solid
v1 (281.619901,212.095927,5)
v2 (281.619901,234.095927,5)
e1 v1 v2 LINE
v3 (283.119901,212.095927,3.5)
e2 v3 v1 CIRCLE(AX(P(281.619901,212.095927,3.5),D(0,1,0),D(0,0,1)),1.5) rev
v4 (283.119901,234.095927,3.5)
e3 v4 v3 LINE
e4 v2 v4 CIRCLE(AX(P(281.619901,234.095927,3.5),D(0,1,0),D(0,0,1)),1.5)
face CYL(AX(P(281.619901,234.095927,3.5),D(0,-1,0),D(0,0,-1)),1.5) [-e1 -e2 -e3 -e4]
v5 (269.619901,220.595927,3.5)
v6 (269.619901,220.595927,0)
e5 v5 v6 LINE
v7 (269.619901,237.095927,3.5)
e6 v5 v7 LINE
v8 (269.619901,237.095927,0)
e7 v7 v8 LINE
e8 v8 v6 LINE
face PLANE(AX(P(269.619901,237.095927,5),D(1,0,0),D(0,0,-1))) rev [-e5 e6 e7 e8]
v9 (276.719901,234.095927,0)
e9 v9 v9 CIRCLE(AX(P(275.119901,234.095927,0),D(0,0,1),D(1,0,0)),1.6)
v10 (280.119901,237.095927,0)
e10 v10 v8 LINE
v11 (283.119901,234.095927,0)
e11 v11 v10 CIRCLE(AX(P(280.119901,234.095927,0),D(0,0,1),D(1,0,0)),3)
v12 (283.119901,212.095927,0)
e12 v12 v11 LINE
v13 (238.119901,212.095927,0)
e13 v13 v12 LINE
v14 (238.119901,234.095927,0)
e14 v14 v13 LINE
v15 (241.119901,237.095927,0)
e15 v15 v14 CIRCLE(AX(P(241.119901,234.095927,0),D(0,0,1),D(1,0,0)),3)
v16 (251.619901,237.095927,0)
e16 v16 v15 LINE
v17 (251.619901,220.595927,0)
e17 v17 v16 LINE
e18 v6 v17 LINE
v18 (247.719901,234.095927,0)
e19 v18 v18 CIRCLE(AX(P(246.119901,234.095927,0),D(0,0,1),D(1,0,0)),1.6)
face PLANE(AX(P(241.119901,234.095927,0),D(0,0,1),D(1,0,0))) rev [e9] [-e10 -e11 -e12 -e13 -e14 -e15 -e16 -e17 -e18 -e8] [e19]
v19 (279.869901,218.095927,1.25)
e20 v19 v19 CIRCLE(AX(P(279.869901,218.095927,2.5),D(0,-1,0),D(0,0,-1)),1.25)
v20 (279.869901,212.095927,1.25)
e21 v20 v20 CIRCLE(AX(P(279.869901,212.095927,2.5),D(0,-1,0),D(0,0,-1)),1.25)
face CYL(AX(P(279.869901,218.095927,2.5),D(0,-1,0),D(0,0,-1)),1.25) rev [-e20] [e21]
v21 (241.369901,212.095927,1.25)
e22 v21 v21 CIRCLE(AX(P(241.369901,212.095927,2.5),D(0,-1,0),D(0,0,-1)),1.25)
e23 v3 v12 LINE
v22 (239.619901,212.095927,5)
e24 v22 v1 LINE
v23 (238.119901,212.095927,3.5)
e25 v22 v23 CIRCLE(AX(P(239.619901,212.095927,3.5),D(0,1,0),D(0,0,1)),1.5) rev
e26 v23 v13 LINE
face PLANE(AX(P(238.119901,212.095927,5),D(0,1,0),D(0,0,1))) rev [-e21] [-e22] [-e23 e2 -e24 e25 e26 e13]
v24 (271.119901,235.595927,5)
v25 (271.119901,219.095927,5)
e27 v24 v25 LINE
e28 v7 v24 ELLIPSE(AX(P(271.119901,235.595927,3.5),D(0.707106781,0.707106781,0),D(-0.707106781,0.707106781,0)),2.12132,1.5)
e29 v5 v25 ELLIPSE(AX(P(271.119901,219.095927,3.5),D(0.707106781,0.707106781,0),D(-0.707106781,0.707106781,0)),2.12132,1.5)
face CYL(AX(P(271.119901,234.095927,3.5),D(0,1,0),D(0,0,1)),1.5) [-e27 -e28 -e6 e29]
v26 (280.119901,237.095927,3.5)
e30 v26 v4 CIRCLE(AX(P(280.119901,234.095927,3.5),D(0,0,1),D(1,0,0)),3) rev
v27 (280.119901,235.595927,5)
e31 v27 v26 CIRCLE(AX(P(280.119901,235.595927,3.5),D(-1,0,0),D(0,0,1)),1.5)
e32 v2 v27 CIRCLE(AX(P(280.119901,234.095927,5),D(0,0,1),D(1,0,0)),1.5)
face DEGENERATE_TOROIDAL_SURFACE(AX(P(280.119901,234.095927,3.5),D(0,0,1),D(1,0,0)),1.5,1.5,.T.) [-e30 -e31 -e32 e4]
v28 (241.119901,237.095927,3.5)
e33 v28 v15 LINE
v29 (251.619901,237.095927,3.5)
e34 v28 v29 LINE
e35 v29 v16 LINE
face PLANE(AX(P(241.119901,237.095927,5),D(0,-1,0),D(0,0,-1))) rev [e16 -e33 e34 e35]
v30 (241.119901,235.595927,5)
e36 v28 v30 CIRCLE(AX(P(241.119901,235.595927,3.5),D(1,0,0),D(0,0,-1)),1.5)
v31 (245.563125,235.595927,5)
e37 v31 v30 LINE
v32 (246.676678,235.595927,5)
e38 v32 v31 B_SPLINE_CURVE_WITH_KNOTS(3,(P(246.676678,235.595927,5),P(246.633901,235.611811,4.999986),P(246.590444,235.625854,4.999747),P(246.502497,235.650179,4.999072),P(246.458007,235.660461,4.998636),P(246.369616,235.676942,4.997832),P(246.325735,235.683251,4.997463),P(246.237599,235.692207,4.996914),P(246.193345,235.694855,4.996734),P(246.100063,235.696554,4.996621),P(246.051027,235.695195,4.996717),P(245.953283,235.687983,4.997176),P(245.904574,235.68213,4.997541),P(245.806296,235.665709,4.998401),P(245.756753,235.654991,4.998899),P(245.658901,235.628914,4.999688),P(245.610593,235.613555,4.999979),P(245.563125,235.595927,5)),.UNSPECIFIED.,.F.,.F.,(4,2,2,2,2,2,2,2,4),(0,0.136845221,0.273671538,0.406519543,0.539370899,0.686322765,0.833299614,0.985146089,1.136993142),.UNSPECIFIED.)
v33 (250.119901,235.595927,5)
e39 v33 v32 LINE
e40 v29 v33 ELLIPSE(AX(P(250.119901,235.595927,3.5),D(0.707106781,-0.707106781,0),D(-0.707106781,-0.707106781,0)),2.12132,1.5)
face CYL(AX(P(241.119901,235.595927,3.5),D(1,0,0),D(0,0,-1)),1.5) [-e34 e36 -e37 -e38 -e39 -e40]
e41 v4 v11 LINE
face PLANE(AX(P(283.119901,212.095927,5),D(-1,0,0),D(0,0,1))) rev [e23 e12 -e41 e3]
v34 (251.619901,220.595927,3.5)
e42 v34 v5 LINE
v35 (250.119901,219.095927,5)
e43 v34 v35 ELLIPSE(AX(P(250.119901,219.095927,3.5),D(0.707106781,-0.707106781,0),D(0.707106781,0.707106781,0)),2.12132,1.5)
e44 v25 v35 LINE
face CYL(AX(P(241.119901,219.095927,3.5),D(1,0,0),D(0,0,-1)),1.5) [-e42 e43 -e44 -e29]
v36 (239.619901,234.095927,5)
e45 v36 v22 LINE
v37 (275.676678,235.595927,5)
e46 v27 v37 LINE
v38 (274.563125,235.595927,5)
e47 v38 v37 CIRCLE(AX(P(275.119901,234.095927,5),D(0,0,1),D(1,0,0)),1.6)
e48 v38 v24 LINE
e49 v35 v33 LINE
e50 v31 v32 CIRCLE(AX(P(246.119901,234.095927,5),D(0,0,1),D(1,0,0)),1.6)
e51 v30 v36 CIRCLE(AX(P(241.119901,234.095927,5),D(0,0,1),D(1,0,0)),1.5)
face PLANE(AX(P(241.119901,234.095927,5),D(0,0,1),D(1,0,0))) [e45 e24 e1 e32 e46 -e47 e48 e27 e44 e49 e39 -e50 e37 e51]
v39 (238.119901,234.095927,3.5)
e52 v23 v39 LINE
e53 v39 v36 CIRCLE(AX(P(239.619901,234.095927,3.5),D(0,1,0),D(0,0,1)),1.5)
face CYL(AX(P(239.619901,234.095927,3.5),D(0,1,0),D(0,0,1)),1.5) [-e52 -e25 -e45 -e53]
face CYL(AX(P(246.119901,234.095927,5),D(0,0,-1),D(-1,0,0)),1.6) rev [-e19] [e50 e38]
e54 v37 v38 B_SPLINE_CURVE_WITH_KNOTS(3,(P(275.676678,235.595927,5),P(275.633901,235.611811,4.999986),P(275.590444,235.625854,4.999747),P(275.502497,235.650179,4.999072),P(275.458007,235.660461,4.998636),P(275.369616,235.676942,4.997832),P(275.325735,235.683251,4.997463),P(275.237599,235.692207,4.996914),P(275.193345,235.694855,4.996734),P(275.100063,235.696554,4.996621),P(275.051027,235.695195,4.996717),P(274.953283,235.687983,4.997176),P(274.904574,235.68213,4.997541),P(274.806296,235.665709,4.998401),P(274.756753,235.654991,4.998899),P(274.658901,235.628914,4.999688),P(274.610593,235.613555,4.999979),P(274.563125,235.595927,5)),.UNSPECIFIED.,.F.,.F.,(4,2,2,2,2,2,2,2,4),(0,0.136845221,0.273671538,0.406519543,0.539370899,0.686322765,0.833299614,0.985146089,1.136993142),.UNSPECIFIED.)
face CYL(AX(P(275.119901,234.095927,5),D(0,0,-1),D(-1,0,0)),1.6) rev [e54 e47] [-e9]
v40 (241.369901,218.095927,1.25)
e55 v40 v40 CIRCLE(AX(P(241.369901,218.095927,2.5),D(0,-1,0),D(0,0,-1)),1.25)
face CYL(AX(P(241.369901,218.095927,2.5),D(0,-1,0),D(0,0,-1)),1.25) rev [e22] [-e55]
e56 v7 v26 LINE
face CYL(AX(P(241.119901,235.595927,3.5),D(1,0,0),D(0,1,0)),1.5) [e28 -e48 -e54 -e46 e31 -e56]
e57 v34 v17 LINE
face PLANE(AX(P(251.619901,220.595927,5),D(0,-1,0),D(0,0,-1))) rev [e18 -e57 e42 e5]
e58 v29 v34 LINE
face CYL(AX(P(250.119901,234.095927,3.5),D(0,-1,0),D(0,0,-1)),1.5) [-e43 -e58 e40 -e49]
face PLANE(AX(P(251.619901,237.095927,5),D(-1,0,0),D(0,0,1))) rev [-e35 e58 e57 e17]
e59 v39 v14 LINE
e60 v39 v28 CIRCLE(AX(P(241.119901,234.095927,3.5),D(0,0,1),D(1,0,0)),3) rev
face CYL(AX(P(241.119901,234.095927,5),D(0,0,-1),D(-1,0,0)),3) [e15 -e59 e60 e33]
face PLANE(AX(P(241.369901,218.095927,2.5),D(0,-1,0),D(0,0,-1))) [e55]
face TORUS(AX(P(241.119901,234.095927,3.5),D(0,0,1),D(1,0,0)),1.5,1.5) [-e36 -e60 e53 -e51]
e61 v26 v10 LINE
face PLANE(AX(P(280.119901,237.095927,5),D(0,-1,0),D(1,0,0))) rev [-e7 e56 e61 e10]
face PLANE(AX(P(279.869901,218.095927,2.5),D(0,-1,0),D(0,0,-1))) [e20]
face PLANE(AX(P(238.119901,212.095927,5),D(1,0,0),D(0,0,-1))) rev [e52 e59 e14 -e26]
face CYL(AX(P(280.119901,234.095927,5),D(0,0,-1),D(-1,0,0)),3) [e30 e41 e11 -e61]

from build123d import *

# Parameters (mm, degrees)
MODEL_R             = 1.6
EXTRUDE_1_DEPTH     = 5
SKETCH_2_R          = 1.25
CUT_EXTRUDE_1_DEPTH = 6
FILLET_1_R          = 1.5


with BuildPart() as part:
    # Model → 凸台-拉伸1 (new body)
    with BuildSketch(Plane.XY):
        with BuildLine():
            Line((241.119901236, 237.095927438), (251.619901236, 237.095927438))
            Line((251.619901236, 237.095927438), (251.619901236, 220.595927438))
            Line((251.619901236, 220.595927438), (269.619901236, 220.595927438))
            Line((269.619901236, 220.595927438), (269.619901236, 237.095927438))
            Line((269.619901236, 237.095927438), (280.119901236, 237.095927438))
            ThreePointArc((280.119901236, 237.095927438), (282.241221579, 236.217247782), (283.119901236, 234.095927438))
            Line((283.119901236, 234.095927438), (283.119901236, 212.095927438))
            Line((283.119901236, 212.095927438), (238.119901236, 212.095927438))
            Line((238.119901236, 212.095927438), (238.119901236, 234.095927438))
            ThreePointArc((238.119901236, 234.095927438), (238.998580892, 236.217247782), (241.119901236, 237.095927438))
        make_face()
        with Locations((246.119901236, 234.095927438)):
            Circle(MODEL_R, mode=Mode.SUBTRACT)
        with Locations((275.119901236, 234.095927438)):
            Circle(MODEL_R, mode=Mode.SUBTRACT)
    extrude(amount=EXTRUDE_1_DEPTH)

    # 草图2 → 切除-拉伸1 (cut)
    with BuildSketch(Plane.XZ.offset(-212.095927438)):
        with Locations(Location((241.369901236, 2.5, 0), (0, 0, 270))):
            Circle(SKETCH_2_R)
        with Locations(Location((279.869901236, 2.5, 0), (0, 0, 270))):
            Circle(SKETCH_2_R)
    extrude(amount=-CUT_EXTRUDE_1_DEPTH, mode=Mode.SUBTRACT)

    # 圆角1
    # the kernel refuses this fillet: 1.5 mm, written as the material it takes off along each edge
    with BuildSketch(Plane(origin=(283.119901236, 234.095927438, 5), x_dir=(0, 0, -1), z_dir=(0, -1, 0))) as fillet_1_piece_1:
        with BuildLine():
            CenterArc((FILLET_1_R, -FILLET_1_R), FILLET_1_R, 90, 90)
            Line((0, -FILLET_1_R), (0, 0))
            Line((0, 0), (FILLET_1_R, 0))
        make_face()
    extrude(amount=25.75, mode=Mode.SUBTRACT)
    with BuildSketch(Plane(origin=(280.119901236, 234.095927438, 5), x_dir=(0, 1, 0), z_dir=(-1, 0, 0))) as fillet_1_piece_2:
        with BuildLine():
            CenterArc((3 - FILLET_1_R, FILLET_1_R), FILLET_1_R, 270, 90)
            Line((3 - FILLET_1_R, 0), (3, 0))
            Line((3, 0), (3, FILLET_1_R))
        make_face()
    revolve(axis=Axis((280.119901236, 234.095927438, 5), (0, 0, -1)), revolution_arc=90, mode=Mode.SUBTRACT)
    with BuildSketch(Plane(origin=(265.869901236, 237.095927438, 5), x_dir=(0, 0, -1), z_dir=(1, 0, 0))) as fillet_1_piece_3:
        with BuildLine():
            CenterArc((FILLET_1_R, -FILLET_1_R), FILLET_1_R, 90, 90)
            Line((0, -FILLET_1_R), (0, 0))
            Line((0, 0), (FILLET_1_R, 0))
        make_face()
    extrude(amount=14.25, mode=Mode.SUBTRACT)
    with BuildSketch(Plane(origin=(269.619901236, 220.595927438, 5), x_dir=(1, 0, 0), z_dir=(0, 1, 0)), Plane(origin=(251.619901236, 240.845927438, 5), x_dir=(-1, 0, 0), z_dir=(0, -1, 0))) as fillet_1_piece_4:
        with BuildLine():
            CenterArc((FILLET_1_R, FILLET_1_R), FILLET_1_R, 180, 90)
            Line((0, FILLET_1_R), (0, 0))
            Line((0, 0), (FILLET_1_R, 0))
        make_face()
    extrude(amount=20.25, mode=Mode.SUBTRACT)
    with BuildSketch(Plane(origin=(251.619901236, 220.595927438, 5), x_dir=(0, -1, 0), z_dir=(1, 0, 0))) as fillet_1_piece_5:
        with BuildLine():
            CenterArc((FILLET_1_R, FILLET_1_R), FILLET_1_R, 180, 90)
            Line((0, FILLET_1_R), (0, 0))
            Line((0, 0), (FILLET_1_R, 0))
        make_face()
    extrude(amount=18, mode=Mode.SUBTRACT)
    with BuildSketch(Plane(origin=(241.119901236, 237.095927438, 5), x_dir=(0, -1, 0), z_dir=(1, 0, 0))) as fillet_1_piece_6:
        with BuildLine():
            CenterArc((FILLET_1_R, FILLET_1_R), FILLET_1_R, 180, 90)
            Line((0, FILLET_1_R), (0, 0))
            Line((0, 0), (FILLET_1_R, 0))
        make_face()
    extrude(amount=14.25, mode=Mode.SUBTRACT)
    with BuildSketch(Plane(origin=(241.119901236, 234.095927438, 5), x_dir=(-1, 0, 0), z_dir=(0, -1, 0))) as fillet_1_piece_7:
        with BuildLine():
            CenterArc((3 - FILLET_1_R, FILLET_1_R), FILLET_1_R, 270, 90)
            Line((3, FILLET_1_R), (3, 0))
            Line((3, 0), (3 - FILLET_1_R, 0))
        make_face()
    revolve(axis=Axis((241.119901236, 234.095927438, 5), (0, 0, -1)), revolution_arc=90, mode=Mode.SUBTRACT)
    with BuildSketch(Plane(origin=(238.119901236, 208.345927438, 5), x_dir=(1, 0, 0), z_dir=(0, 1, 0))) as fillet_1_piece_8:
        with BuildLine():
            CenterArc((FILLET_1_R, FILLET_1_R), FILLET_1_R, 180, 90)
            Line((0, FILLET_1_R), (0, 0))
            Line((0, 0), (FILLET_1_R, 0))
        make_face()
    extrude(amount=25.75, mode=Mode.SUBTRACT)
    with BuildSketch(Plane(origin=(251.619901236, 220.595927438, 5), x_dir=(0, -1, 0), z_dir=(1, 0, 0))) as fillet_1_piece_9a_section:
        with BuildLine():
            CenterArc((FILLET_1_R, FILLET_1_R), FILLET_1_R, 180, 90)
            Line((0, FILLET_1_R), (0, 0))
            Line((0, 0), (FILLET_1_R, 0))
        make_face()
    fillet_1_piece_9a = extrude(amount=21.75, mode=Mode.PRIVATE)
    fillet_1_piece_9a = split(fillet_1_piece_9a, bisect_by=Plane(origin=(269.619901236, 220.256334767, 4.660407329), z_dir=(1, 0, 0)), keep=Keep.TOP, mode=Mode.PRIVATE)
    with BuildSketch(Plane(origin=(269.619901236, 216.845927438, 5), x_dir=(1, 0, 0), z_dir=(0, 1, 0))) as fillet_1_piece_9b_section:
        with BuildLine():
            CenterArc((FILLET_1_R, FILLET_1_R), FILLET_1_R, 180, 90)
            Line((0, FILLET_1_R), (0, 0))
            Line((0, 0), (FILLET_1_R, 0))
        make_face()
    fillet_1_piece_9b = extrude(amount=24, mode=Mode.PRIVATE)
    fillet_1_piece_9b = split(fillet_1_piece_9b, bisect_by=Plane(origin=(269.959493907, 220.595927438, 4.660407329), z_dir=(0, -1, 0)), keep=Keep.TOP, mode=Mode.PRIVATE)
    fillet_1_piece_9 = fillet_1_piece_9a & fillet_1_piece_9b
    add(fillet_1_piece_9, mode=Mode.SUBTRACT)
    with BuildSketch(Plane(origin=(251.619901236, 240.845927438, 5), x_dir=(-1, 0, 0), z_dir=(0, -1, 0))) as fillet_1_piece_10a_section:
        with BuildLine():
            CenterArc((FILLET_1_R, FILLET_1_R), FILLET_1_R, 180, 90)
            Line((0, FILLET_1_R), (0, 0))
            Line((0, 0), (FILLET_1_R, 0))
        make_face()
    fillet_1_piece_10a = extrude(amount=24, mode=Mode.PRIVATE)
    fillet_1_piece_10a = split(fillet_1_piece_10a, bisect_by=Plane(origin=(251.280308564, 220.595927438, 4.660407329), z_dir=(0, -1, 0)), keep=Keep.TOP, mode=Mode.PRIVATE)
    with BuildSketch(Plane(origin=(247.869901236, 220.595927438, 5), x_dir=(0, -1, 0), z_dir=(1, 0, 0))) as fillet_1_piece_10b_section:
        with BuildLine():
            CenterArc((FILLET_1_R, FILLET_1_R), FILLET_1_R, 180, 90)
            Line((0, FILLET_1_R), (0, 0))
            Line((0, 0), (FILLET_1_R, 0))
        make_face()
    fillet_1_piece_10b = extrude(amount=21.75, mode=Mode.PRIVATE)
    fillet_1_piece_10b = split(fillet_1_piece_10b, bisect_by=Plane(origin=(251.619901236, 220.256334767, 4.660407329), z_dir=(-1, 0, 0)), keep=Keep.TOP, mode=Mode.PRIVATE)
    fillet_1_piece_10 = fillet_1_piece_10a & fillet_1_piece_10b
    add(fillet_1_piece_10, mode=Mode.SUBTRACT)


solid = part.part
